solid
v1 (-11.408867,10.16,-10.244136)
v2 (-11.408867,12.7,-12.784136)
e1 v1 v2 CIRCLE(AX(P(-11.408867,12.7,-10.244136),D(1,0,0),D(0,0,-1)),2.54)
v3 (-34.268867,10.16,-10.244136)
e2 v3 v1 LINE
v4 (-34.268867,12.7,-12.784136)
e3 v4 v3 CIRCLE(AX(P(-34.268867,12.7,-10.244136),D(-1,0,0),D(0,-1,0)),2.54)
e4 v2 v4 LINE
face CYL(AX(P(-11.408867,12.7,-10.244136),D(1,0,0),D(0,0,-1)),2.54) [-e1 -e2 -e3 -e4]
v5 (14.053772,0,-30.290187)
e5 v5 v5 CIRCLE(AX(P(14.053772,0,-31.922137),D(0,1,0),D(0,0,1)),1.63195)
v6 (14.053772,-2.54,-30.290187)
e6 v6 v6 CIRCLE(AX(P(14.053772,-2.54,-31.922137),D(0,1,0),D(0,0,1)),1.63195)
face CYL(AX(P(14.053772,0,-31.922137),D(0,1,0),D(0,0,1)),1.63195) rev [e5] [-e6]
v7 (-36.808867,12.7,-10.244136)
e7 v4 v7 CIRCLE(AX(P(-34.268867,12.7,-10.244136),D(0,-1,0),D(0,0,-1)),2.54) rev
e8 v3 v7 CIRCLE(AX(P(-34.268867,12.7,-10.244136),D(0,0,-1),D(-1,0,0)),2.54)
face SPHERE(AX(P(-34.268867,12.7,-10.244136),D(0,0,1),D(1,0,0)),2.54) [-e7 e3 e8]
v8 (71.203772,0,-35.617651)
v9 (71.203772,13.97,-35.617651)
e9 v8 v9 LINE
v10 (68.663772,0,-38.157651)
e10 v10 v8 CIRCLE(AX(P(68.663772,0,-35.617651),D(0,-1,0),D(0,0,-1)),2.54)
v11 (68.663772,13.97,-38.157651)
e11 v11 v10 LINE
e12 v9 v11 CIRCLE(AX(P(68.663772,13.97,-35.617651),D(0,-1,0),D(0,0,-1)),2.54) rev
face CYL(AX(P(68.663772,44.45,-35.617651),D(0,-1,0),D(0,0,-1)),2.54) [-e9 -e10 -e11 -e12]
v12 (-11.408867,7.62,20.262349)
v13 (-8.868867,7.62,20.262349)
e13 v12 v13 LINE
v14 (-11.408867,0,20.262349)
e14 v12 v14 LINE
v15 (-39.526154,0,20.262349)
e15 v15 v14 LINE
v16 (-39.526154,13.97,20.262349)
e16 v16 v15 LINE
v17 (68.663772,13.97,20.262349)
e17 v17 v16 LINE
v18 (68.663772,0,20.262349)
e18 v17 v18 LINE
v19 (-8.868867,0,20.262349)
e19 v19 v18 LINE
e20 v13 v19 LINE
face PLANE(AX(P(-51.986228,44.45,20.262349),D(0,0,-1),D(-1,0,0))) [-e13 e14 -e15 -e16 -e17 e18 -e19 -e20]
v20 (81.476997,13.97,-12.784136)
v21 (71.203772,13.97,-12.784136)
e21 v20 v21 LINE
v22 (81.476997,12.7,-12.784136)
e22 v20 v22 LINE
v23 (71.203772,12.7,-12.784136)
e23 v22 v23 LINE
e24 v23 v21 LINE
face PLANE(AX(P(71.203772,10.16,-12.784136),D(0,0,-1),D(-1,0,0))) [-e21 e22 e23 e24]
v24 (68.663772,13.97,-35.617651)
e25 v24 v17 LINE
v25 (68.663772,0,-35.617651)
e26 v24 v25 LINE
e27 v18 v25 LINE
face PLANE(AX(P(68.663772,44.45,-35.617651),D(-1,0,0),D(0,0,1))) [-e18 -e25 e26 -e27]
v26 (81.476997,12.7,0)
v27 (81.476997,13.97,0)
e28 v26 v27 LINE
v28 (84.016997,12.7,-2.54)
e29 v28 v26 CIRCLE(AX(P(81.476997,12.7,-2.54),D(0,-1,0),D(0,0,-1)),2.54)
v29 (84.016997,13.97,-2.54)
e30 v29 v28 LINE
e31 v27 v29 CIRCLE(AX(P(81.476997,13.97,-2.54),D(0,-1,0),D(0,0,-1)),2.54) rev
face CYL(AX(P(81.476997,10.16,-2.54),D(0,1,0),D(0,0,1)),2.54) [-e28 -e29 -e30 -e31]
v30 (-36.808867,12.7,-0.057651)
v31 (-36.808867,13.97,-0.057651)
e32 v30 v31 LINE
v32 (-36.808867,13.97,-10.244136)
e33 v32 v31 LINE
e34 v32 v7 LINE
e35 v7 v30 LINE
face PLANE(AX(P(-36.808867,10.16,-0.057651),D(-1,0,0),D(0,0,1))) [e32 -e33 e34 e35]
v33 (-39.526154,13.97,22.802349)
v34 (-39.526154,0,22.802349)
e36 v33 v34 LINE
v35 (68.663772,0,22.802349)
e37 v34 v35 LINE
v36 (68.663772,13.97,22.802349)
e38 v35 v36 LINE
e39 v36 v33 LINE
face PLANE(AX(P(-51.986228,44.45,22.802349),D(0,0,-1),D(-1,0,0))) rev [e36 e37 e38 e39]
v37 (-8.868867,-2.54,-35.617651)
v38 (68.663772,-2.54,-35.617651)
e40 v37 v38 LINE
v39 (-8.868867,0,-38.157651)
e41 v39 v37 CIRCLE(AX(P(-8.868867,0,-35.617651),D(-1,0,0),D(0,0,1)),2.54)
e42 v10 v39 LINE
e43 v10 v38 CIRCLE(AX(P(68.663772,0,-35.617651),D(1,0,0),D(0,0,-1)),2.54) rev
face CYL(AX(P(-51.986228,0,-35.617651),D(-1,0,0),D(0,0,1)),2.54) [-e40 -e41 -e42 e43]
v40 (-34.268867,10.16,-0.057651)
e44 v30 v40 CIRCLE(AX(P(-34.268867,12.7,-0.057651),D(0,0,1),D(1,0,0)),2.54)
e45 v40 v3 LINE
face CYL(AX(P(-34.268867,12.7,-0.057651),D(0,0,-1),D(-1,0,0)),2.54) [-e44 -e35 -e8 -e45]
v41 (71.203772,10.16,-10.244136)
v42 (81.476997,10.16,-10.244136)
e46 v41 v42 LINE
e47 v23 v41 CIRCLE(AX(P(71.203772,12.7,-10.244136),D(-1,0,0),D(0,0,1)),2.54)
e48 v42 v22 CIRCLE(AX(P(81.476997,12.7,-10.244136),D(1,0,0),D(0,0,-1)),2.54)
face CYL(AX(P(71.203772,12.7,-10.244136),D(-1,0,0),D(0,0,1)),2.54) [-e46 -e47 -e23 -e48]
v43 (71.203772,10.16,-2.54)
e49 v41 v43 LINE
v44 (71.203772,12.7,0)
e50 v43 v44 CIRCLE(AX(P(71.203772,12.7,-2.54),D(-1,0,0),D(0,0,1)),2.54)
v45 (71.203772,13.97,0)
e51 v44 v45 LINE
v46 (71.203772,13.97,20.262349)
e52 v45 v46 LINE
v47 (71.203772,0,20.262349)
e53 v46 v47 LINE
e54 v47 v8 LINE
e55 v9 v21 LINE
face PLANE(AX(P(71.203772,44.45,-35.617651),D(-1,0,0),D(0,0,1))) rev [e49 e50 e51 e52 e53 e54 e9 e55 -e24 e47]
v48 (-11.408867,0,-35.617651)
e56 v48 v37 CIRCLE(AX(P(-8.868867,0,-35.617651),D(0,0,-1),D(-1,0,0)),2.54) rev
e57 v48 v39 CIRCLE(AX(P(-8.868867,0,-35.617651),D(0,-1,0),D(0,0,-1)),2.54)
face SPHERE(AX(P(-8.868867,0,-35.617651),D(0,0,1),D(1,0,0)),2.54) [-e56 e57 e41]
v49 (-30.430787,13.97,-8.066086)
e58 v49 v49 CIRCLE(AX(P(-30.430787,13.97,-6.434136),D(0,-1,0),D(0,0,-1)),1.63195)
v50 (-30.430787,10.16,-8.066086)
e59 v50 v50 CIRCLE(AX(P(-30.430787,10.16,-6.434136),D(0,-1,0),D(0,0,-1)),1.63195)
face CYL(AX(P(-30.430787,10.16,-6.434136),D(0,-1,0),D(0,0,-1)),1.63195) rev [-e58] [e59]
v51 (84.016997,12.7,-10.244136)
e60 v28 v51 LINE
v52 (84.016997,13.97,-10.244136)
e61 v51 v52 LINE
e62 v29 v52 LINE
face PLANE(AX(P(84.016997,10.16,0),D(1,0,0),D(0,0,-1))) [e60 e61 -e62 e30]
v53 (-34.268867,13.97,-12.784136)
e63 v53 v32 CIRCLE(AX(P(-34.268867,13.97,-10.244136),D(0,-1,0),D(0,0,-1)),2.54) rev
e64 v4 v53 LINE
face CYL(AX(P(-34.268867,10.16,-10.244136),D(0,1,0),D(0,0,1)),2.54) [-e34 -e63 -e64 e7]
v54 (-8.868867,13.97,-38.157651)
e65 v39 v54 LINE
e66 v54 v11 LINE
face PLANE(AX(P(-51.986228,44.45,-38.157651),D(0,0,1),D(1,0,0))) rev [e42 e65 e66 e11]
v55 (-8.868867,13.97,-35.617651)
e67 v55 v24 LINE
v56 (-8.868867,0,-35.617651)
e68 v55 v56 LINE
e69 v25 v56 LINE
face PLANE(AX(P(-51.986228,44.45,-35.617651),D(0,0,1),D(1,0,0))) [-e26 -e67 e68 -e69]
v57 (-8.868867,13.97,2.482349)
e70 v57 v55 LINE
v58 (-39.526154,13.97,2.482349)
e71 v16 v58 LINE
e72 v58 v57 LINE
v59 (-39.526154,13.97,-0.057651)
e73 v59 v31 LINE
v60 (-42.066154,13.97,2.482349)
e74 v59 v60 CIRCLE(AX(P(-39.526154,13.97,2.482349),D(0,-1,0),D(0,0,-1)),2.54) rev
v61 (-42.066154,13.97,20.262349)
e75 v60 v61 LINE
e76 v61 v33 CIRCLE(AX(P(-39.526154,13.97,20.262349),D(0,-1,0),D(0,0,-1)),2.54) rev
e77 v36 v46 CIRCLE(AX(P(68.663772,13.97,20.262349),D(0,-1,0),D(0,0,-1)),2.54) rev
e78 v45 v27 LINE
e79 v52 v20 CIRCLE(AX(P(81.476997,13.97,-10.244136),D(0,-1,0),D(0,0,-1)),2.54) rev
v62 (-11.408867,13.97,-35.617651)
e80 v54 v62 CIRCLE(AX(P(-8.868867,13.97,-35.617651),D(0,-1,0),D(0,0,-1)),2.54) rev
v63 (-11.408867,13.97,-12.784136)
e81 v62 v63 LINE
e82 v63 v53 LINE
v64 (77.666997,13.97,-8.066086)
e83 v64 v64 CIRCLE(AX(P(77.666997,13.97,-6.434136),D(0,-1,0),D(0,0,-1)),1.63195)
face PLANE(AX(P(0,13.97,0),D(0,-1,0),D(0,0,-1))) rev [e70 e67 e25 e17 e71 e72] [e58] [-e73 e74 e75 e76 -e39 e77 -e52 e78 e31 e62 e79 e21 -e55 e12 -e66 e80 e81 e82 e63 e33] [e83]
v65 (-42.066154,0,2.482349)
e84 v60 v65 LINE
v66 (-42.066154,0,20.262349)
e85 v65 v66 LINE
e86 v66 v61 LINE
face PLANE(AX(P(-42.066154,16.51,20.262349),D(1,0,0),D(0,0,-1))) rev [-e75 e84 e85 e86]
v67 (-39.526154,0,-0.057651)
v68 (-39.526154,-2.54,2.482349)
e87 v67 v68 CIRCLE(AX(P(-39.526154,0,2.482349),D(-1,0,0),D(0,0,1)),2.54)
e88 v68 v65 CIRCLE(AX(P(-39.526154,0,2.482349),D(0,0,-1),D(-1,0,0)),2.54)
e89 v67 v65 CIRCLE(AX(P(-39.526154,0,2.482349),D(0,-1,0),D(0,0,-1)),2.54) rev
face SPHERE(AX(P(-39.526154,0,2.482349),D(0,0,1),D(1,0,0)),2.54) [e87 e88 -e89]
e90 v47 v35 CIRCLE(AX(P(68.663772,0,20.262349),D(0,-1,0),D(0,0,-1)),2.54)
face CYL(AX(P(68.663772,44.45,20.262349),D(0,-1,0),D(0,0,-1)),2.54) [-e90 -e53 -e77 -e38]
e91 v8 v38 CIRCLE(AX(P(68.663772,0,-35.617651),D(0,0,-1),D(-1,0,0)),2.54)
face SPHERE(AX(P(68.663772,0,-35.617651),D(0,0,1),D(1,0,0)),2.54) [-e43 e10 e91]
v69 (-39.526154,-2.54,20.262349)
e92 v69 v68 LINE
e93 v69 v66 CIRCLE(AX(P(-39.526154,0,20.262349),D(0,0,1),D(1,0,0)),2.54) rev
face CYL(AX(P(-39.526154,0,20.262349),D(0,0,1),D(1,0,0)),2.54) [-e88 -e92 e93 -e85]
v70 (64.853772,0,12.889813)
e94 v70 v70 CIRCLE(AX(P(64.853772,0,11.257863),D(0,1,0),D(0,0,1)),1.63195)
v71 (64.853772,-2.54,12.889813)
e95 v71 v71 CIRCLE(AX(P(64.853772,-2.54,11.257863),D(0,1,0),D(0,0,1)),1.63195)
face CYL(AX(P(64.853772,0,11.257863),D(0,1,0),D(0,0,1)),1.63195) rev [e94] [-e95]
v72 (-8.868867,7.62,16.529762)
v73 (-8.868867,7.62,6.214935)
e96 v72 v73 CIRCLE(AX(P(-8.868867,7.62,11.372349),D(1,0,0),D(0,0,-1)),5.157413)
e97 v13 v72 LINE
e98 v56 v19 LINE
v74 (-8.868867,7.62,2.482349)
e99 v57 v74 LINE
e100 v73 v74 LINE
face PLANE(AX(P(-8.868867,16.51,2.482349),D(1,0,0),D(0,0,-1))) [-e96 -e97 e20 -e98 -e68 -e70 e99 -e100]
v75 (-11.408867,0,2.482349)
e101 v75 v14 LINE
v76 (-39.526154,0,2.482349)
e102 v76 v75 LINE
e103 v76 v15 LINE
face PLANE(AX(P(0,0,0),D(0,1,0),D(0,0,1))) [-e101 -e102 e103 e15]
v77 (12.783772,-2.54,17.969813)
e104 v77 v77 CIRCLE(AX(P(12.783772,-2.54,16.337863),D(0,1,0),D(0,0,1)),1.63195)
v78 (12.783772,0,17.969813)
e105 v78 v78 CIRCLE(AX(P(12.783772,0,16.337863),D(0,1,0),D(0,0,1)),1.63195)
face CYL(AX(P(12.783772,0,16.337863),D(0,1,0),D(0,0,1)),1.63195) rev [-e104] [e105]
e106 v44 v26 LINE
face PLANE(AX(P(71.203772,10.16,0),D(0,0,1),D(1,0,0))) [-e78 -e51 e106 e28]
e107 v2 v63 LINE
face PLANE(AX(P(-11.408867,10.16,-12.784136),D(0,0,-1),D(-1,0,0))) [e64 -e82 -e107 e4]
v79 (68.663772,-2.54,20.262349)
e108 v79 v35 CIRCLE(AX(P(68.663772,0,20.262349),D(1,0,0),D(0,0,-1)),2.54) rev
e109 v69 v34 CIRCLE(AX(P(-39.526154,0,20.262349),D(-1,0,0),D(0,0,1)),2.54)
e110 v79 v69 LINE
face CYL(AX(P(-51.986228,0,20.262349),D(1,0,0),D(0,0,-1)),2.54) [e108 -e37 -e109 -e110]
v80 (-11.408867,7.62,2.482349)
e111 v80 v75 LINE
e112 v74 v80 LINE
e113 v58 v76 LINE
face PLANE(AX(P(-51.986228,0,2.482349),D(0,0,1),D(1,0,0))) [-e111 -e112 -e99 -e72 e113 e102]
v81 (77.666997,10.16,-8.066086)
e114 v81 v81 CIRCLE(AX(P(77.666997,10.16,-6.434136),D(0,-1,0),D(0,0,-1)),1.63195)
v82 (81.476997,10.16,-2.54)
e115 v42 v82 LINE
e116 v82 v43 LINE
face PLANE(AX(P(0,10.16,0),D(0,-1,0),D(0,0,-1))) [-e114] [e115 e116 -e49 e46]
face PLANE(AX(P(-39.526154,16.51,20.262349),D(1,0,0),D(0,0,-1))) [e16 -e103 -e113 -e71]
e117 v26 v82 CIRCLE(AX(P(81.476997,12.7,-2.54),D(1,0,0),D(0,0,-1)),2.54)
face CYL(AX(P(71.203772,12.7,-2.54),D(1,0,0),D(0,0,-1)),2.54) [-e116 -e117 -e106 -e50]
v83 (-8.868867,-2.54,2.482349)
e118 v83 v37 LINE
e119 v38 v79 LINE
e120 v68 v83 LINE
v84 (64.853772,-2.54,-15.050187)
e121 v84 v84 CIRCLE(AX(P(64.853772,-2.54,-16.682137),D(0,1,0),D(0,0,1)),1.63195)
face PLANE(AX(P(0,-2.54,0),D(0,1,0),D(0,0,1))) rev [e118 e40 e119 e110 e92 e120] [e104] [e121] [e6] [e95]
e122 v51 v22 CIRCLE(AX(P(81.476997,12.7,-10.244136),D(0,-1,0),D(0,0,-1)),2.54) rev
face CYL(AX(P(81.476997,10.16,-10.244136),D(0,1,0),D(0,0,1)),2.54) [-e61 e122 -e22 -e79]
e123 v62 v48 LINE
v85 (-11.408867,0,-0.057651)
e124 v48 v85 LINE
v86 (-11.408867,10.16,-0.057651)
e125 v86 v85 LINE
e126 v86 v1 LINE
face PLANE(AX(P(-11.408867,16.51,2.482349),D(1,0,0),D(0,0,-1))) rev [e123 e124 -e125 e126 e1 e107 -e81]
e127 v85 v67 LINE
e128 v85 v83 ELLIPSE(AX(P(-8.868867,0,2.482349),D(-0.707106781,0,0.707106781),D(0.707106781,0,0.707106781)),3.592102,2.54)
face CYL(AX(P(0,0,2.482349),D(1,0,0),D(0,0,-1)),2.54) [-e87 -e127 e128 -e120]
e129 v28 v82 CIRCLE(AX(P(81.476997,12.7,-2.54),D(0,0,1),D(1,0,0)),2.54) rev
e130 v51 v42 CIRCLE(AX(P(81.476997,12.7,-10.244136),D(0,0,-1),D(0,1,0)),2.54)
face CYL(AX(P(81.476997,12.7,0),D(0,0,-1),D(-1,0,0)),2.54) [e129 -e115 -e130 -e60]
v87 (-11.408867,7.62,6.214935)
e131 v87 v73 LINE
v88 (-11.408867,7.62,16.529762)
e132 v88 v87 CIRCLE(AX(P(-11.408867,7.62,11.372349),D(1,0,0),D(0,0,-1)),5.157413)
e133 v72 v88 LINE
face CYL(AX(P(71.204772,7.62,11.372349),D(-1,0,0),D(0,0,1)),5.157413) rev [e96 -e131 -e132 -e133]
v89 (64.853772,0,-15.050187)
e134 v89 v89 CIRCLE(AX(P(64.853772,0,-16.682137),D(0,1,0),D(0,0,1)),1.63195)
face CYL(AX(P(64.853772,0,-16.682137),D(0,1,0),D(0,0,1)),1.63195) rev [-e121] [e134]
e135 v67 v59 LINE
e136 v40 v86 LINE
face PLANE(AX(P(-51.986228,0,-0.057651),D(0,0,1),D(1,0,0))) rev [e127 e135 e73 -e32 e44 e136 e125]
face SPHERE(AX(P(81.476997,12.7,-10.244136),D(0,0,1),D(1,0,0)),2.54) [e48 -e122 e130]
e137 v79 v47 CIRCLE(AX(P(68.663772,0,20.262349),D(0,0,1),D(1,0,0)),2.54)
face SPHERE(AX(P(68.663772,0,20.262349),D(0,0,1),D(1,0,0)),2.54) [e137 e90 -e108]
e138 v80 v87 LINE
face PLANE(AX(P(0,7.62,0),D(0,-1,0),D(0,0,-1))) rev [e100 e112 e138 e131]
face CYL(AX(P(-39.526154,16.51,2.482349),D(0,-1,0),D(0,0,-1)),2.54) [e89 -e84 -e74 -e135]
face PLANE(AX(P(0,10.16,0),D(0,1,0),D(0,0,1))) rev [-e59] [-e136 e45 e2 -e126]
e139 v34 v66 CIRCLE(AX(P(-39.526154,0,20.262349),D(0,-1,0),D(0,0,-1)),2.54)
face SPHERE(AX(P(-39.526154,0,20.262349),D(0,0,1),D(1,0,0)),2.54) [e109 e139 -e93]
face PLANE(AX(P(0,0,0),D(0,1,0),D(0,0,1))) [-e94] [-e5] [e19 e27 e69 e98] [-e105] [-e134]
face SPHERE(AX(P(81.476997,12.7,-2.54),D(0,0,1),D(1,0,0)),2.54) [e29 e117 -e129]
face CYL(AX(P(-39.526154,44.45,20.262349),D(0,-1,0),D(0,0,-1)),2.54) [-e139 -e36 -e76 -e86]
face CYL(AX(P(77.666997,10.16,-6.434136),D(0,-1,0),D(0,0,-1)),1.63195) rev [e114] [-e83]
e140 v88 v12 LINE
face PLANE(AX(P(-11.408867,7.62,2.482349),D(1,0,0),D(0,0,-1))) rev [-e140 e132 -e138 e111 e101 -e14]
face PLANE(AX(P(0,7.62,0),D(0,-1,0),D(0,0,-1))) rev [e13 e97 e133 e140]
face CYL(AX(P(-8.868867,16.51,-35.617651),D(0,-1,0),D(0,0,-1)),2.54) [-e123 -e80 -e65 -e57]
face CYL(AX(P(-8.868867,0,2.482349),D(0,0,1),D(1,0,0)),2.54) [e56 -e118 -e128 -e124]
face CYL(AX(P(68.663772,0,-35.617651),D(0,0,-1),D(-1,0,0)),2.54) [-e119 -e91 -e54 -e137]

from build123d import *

# Parameters (mm, degrees)
STOCK_LED_START                   = -2.54
STOCK_LED_LIGHT_HOUSING_1_DEPTH   = 2.54
STOCK_LED_LIGHT_HOUSING_1_2_DEPTH = 13.97
SKETCH3_W                         = 2.54
SKETCH3_H                         = 17.78
PIECE_UNDER_BATTERY_PLUG_DEPTH    = 7.62
CUT_OUT_FOR_PLUG_REACH            = 94.065
SKETCH4_R                         = 5.157413323
HOLES_FOR_SCREWS_D                = 3.2639
SKETCH7_W                         = 25.4
SKETCH7_H                         = 12.726484406
SKETCH7_W_2                       = 12.813224924
SKETCH7_H_2                       = 12.784135739
NAILS_GO_HERE_DEPTH               = 3.81
NAIL_HOLES_D                      = 3.2639
FILLET1_R                         = 2.54


# Read off the part's stored shape, not the designer's step: Stock-LED Light housing-1
with BuildPart() as part:
    # Stock-LED Light housing-1 outline → Stock-LED Light housing-1 (new body)
    with BuildSketch(Plane(origin=(0, 0, 0), x_dir=(1, 0, 0), z_dir=(0, 1, 0)).offset(STOCK_LED_START)):
        Polygon((71.203772107, -22.802348667), (71.203772107, 38.157651333), (-11.408866572, 38.157651333), (-11.408866572, 0.057651333), (-42.066153873, 0.057651333), (-42.066153873, -22.802348667), align=None)
    extrude(amount=STOCK_LED_LIGHT_HOUSING_1_DEPTH)

    # Stock-LED Light housing-1 2 outline → Stock-LED Light housing-1 2 (add)
    with BuildSketch(Plane(origin=(0, 0, 0), x_dir=(1, 0, 0), z_dir=(0, 1, 0))):
        Polygon((71.203772107, -22.802348667), (71.203772107, 38.157651333), (-11.408866572, 38.157651333), (-11.408866572, 0.057651333), (-42.066153873, 0.057651333), (-42.066153873, -22.802348667), align=None)
        Polygon((-39.526153873, -20.262348667), (-39.526153873, -2.482348667), (-8.868866572, -2.482348667), (-8.868866572, 35.617651333), (68.663772107, 35.617651333), (68.663772107, -20.262348667), align=None, mode=Mode.SUBTRACT)
    extrude(amount=STOCK_LED_LIGHT_HOUSING_1_2_DEPTH)

    # Sketch3 → Piece under battery plug (add)
    with BuildSketch(Plane(origin=(0, 0, 0), x_dir=(1, 0, 0), z_dir=(0, 1, 0))):
        with Locations((-10.138866572, -11.372348667)):
            Rectangle(SKETCH3_W, SKETCH3_H)
    extrude(amount=PIECE_UNDER_BATTERY_PLUG_DEPTH)

    # Sketch4 → Cut out for plug (cut, up to next)
    with BuildSketch(Plane(origin=(-11.408866572, 0, 0), x_dir=(0, 0, -1), z_dir=(1, 0, 0)), mode=Mode.PRIVATE) as cut_out_for_plug_sk1:
        with Locations((-11.372348667, 7.62)):
            Circle(SKETCH4_R)
    cut_out_for_plug_tool1 = extrude(cut_out_for_plug_sk1.sketch, amount=CUT_OUT_FOR_PLUG_REACH, mode=Mode.PRIVATE) & part.part
    add(cut_out_for_plug_tool1.solids().sort_by_distance((-11.408867, 7.62, 11.372349))[0], mode=Mode.SUBTRACT)

    # holes for screws (through all)
    with Locations(Plane(origin=(0, 0, 0), x_dir=(1, 0, 0), z_dir=(0, 1, 0))):
        with Locations((14.053772107, 31.922137324), (12.783772107, -16.337862676), (64.853772107, -11.257862676), (64.853772107, 16.682137324)):
            Hole(HOLES_FOR_SCREWS_D / 2)

    # Sketch7 → Nails go here (add)
    with BuildSketch(Plane(origin=(0, 13.97, 0), x_dir=(1, 0, 0), z_dir=(0, 1, 0))):
        with Locations((-24.108866572, 6.420893536)):
            Rectangle(SKETCH7_W, SKETCH7_H)
        with Locations((77.610384569, 6.39206787)):
            Rectangle(SKETCH7_W_2, SKETCH7_H_2)
    extrude(amount=-NAILS_GO_HERE_DEPTH)

    # Nail holes (through all)
    with Locations(Plane(origin=(0, 10.16, 0), x_dir=(-1, 0, 0), z_dir=(0, -1, 0))):
        with Locations((30.430786564, 6.434135739), (-77.666997031, 6.434135739)):
            Hole(NAIL_HOLES_D / 2)

    # Fillet1
    fillet1_edges = [part.edges().sort_by_distance(p)[0] for p in [
        (71.203772107, 5.715, -38.157651333),
        (71.203772107, 5.715, 22.802348667),
        (-36.808866572, 10.16, -6.420893536),
        (-24.108866572, 10.16, -12.784135739),
        (-36.808866572, 12.065, -12.784135739),
        (77.610384569, 10.16, -12.784135739),
        (84.016997031, 10.16, -6.392067869),
        (84.016997031, 12.065, -12.784135739),
        (77.610384569, 10.16, 0),
        (84.016997031, 12.065, 0),
        (-26.737510222, -2.54, -0.057651333),
        (14.568809117, -2.54, 22.802348667),
        (29.897452767, -2.54, -38.157651333),
        (-42.066153873, 5.715, 22.802348667),
        (-42.066153873, 5.715, -0.057651333),
        (-42.066153873, -2.54, 11.372348667),
        (71.203772107, -2.54, -7.677651333),
        (-11.408866572, 5.715, -38.157651333),
        (-11.408866572, -2.54, -19.107651333),
    ]]
    fillet(fillet1_edges, radius=FILLET1_R)


solid = part.part
